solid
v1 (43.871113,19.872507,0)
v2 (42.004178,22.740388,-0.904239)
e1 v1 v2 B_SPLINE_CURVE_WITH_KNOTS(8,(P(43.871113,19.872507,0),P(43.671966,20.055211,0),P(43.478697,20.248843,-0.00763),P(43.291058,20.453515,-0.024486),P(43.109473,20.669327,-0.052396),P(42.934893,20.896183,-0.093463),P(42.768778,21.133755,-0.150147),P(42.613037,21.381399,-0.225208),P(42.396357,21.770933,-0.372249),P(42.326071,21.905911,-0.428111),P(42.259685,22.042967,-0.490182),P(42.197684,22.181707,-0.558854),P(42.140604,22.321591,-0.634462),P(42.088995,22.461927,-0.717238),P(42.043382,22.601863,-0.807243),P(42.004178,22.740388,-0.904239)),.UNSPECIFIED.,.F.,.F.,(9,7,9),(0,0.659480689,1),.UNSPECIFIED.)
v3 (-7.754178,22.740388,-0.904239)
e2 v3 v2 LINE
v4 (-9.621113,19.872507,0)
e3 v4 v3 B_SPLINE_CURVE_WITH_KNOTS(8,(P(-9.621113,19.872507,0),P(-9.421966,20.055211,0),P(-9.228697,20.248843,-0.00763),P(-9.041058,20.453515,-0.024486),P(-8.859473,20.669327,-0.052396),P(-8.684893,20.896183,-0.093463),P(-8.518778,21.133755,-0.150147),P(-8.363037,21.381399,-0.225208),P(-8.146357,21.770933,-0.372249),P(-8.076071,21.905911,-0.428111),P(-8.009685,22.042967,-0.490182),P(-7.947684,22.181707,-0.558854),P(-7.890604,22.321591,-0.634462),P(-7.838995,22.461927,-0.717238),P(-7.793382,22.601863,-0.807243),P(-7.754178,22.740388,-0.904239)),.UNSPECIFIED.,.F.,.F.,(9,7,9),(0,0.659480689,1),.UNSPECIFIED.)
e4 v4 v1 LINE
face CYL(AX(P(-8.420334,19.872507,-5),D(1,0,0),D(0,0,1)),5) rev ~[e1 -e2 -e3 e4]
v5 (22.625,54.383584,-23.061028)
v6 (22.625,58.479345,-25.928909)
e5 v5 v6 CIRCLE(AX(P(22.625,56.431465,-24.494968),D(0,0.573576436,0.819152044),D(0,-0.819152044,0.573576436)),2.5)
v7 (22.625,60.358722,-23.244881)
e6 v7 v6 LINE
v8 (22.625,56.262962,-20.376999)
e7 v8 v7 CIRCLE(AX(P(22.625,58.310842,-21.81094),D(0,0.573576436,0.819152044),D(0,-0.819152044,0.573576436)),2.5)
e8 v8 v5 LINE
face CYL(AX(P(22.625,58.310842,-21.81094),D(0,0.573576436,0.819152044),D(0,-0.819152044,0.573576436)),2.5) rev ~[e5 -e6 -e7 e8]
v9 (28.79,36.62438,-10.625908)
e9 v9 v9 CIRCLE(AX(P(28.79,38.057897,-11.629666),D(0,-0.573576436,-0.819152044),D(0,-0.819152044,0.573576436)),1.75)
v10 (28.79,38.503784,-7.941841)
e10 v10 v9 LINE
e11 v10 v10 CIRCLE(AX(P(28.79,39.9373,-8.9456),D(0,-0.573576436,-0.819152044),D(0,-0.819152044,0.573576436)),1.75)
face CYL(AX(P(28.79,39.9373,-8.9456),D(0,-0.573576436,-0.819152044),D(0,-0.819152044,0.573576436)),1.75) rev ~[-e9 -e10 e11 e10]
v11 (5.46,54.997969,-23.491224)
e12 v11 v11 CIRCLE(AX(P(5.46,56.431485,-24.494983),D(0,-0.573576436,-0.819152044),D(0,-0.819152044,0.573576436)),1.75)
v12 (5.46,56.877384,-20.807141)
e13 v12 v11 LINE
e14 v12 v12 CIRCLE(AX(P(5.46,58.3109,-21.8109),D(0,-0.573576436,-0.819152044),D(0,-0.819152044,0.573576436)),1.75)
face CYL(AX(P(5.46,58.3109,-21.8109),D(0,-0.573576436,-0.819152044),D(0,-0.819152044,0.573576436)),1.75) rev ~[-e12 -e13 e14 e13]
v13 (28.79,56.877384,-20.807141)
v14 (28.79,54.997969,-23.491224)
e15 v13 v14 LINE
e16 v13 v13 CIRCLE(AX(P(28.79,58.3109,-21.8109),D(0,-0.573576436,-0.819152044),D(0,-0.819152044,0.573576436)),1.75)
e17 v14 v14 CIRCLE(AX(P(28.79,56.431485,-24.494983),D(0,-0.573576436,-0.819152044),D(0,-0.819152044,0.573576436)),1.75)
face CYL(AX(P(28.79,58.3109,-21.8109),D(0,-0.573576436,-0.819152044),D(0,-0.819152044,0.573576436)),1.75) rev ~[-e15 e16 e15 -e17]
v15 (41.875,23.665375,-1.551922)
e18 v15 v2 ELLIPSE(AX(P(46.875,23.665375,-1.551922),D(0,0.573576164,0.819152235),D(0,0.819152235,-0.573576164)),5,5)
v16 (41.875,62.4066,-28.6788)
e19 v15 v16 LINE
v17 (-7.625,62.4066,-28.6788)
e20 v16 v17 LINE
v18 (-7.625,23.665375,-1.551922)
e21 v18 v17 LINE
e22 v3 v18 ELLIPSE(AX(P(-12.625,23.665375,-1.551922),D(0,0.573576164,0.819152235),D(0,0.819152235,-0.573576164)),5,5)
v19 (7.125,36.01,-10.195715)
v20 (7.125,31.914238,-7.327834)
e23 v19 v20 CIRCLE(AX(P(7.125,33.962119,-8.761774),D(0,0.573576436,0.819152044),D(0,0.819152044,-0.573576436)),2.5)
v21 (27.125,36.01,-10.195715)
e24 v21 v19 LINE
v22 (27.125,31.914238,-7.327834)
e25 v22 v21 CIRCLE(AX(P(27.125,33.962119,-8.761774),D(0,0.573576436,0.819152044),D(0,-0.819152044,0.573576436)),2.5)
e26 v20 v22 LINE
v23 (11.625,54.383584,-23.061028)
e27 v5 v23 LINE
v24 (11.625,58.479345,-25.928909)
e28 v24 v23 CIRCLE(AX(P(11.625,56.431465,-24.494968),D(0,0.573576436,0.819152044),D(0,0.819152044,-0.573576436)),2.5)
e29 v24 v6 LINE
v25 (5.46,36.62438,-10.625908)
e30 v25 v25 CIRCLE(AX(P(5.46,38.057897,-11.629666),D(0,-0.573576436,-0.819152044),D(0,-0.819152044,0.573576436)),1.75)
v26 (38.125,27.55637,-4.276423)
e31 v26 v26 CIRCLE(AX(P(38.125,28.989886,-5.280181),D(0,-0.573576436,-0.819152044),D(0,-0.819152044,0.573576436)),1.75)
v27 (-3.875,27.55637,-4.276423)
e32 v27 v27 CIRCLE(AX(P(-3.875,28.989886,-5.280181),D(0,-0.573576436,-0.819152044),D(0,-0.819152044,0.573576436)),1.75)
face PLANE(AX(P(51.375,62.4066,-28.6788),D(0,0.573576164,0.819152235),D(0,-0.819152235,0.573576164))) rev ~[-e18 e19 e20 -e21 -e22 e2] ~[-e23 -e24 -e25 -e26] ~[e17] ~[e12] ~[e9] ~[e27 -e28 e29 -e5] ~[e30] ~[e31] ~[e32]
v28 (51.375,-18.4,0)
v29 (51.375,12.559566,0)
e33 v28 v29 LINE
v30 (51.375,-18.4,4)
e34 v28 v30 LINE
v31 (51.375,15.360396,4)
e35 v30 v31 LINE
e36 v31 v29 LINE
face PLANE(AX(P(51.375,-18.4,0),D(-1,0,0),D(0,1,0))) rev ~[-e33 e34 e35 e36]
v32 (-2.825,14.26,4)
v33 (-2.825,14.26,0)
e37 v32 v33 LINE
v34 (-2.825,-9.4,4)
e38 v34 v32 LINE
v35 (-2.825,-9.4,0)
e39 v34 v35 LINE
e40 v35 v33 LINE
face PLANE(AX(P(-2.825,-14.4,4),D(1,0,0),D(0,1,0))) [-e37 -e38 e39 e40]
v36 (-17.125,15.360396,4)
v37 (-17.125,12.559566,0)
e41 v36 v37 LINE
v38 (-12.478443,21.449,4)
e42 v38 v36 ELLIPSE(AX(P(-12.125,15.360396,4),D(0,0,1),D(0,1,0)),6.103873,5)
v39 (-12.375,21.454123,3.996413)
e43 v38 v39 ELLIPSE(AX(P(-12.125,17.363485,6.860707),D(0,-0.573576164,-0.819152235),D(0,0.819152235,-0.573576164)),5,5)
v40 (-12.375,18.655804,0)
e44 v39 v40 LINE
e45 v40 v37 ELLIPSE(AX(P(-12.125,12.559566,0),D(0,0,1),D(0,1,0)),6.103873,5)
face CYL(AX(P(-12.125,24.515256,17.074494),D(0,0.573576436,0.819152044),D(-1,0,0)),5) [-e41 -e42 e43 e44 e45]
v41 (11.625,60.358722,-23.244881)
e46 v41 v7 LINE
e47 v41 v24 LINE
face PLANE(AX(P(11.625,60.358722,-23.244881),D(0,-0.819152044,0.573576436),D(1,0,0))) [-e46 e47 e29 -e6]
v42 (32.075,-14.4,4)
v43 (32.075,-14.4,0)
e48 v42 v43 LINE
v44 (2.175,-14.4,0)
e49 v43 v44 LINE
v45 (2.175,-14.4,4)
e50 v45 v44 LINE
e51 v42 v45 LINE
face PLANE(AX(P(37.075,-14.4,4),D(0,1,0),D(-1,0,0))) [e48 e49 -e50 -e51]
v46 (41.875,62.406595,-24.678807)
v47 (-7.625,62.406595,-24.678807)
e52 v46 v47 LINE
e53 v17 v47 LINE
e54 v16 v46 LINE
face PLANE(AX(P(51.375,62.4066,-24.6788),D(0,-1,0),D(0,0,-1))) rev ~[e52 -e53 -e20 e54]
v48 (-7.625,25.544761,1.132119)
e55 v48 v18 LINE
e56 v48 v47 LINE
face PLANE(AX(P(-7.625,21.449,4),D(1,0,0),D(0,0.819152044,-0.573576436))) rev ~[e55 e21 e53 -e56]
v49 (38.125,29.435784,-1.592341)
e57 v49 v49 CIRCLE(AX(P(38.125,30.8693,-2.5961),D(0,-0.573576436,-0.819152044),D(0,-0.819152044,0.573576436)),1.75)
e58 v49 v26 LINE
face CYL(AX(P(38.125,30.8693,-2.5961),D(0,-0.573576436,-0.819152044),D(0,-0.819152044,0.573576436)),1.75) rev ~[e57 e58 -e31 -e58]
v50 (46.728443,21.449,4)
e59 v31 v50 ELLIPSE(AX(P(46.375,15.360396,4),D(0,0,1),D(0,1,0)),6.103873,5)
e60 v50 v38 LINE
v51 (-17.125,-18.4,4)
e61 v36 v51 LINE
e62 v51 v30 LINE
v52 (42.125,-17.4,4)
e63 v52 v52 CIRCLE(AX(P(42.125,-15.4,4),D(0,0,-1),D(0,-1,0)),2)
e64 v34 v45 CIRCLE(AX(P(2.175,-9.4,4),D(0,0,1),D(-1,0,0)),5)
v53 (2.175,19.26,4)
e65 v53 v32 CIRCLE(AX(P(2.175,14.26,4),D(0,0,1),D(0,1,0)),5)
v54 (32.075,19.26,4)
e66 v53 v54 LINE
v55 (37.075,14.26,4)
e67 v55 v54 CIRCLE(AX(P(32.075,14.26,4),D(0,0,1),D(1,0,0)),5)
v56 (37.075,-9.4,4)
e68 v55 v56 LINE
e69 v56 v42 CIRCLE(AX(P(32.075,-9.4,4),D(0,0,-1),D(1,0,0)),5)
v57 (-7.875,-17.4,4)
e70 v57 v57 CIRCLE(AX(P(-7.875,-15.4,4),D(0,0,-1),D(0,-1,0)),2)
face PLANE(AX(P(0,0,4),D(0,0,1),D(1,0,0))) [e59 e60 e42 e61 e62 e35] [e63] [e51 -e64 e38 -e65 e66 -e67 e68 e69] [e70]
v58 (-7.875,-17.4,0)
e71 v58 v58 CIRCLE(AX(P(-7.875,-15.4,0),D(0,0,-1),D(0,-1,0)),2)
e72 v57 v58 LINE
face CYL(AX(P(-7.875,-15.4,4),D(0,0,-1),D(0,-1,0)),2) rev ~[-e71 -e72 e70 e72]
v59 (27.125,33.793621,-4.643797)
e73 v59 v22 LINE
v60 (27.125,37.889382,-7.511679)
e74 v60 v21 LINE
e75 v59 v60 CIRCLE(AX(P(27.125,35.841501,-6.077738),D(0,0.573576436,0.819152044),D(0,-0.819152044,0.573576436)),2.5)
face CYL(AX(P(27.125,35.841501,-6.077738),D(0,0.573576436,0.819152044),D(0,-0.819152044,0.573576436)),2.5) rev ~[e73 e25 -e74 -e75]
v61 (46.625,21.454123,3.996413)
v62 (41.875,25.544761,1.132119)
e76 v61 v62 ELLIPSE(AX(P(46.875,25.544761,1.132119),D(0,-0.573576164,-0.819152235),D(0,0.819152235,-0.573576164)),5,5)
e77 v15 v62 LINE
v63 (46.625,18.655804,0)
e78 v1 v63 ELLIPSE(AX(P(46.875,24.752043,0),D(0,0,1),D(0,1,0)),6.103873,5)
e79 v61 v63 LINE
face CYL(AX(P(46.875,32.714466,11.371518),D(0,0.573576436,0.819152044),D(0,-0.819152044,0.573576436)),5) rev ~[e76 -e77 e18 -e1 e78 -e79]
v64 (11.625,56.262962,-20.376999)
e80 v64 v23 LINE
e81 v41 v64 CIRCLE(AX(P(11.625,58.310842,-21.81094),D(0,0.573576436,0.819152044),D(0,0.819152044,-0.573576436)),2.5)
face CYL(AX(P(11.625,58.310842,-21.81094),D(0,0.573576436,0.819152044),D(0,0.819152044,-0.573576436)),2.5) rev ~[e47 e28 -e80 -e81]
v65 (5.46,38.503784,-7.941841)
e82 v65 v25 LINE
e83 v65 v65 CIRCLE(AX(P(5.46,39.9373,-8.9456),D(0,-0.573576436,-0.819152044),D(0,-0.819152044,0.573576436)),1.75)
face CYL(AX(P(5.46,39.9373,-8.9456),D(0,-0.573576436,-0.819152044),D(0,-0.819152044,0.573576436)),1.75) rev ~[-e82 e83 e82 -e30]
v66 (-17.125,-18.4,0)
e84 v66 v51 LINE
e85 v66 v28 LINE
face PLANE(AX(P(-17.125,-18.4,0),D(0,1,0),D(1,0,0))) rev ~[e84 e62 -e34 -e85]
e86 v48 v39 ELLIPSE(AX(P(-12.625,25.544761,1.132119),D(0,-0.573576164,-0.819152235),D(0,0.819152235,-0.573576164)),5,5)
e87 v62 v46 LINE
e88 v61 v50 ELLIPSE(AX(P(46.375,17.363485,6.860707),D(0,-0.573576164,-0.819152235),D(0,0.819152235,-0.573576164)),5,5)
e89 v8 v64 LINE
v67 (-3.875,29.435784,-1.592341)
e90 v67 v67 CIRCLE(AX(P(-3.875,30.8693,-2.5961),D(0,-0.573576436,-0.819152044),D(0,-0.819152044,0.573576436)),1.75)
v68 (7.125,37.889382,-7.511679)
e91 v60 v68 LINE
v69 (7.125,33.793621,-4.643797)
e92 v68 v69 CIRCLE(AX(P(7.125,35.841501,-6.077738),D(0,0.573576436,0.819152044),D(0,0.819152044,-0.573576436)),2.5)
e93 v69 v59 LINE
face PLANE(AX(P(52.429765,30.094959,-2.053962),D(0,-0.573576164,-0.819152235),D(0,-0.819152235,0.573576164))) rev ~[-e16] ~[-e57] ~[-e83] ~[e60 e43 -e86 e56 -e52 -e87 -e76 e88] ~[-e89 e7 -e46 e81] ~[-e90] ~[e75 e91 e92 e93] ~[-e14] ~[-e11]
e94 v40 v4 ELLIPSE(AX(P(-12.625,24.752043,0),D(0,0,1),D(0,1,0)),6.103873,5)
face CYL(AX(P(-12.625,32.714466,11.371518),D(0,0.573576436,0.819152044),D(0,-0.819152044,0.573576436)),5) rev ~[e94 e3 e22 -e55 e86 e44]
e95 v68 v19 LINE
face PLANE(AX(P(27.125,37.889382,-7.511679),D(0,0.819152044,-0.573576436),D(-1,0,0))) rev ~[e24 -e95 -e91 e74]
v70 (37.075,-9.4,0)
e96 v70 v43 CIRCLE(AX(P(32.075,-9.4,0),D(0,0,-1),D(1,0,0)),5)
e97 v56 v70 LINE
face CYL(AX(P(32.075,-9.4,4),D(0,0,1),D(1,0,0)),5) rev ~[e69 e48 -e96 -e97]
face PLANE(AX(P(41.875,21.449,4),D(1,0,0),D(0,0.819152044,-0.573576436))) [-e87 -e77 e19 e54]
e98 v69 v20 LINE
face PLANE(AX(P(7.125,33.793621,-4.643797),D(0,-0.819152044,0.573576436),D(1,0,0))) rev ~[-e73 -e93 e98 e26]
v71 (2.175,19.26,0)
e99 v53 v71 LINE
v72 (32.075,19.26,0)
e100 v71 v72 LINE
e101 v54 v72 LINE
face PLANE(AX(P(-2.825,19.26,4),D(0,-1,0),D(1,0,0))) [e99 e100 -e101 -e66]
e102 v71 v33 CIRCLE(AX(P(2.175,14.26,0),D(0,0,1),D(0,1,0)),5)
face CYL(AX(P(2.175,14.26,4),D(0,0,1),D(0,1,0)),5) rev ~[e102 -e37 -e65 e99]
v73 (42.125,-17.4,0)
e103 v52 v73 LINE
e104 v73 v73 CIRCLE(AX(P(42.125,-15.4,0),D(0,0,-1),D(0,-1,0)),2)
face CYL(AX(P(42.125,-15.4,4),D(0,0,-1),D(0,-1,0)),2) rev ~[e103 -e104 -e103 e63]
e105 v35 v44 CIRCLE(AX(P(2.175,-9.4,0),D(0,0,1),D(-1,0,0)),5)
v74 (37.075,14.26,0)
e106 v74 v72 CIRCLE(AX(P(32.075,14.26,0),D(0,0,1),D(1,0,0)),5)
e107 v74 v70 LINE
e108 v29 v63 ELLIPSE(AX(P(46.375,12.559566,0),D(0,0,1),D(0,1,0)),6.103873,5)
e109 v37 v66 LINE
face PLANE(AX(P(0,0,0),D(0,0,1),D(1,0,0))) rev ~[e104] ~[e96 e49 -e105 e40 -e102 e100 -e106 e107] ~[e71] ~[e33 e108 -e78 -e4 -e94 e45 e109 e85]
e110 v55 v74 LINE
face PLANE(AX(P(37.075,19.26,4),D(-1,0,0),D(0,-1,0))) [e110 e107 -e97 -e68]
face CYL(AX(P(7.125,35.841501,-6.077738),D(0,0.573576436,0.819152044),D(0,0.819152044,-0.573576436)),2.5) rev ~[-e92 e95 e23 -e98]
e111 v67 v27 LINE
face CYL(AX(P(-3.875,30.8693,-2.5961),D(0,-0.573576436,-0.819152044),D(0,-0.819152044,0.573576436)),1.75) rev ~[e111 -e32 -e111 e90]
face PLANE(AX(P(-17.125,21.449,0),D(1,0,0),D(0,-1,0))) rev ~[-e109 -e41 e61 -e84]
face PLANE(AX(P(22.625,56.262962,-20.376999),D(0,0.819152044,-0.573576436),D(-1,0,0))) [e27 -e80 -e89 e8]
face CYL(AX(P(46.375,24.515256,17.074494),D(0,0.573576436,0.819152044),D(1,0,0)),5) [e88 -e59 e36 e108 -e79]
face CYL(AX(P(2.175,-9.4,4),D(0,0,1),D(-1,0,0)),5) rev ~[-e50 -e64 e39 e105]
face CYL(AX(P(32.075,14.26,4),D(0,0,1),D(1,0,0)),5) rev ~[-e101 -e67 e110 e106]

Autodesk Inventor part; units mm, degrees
ref_plane "YZ Plane" through (0, 0, 0) normal (1, 0, 0) x (0, 1, 0)
ref_plane "XZ Plane" through (0, 0, 0) normal (0, 1, 0) x (-1, 0, 0)
ref_plane "XY Plane" through (0, 0, 0) normal (0, 0, 1) x (1, 0, 0)
sketch "Sketch1" plane through (0, 0, 0) normal (0, 0, 1) x (1, 0, 0)
  circle A0 centre (42.125, -15.4) radius 2 construction
  circle A1 centre (-7.875, -15.4) radius 2 construction
  line L0 (-4.825, -12.4) -> (-2.825, -14.4) construction
  line L1 (-9.825, -12.4) -> (-4.825, -12.4) construction
  arc A2 (-14.825, -7.4) -> (-9.825, -12.4) centre (-9.825, -7.4) ccw construction
  line L2 (-14.825, -7.4) -> (-14.825, 13.6) construction
  line L3 (-14.825, 13.6) -> (-15.625, 13.6) construction
  line L4 (-15.625, 13.6) -> (-15.625, 14.6) construction
  line L5 (-14.825, 15.4) -> (-15.625, 14.6) construction
  line L6 (-14.825, 15.4) -> (-14.825, 18.4) construction
  line L7 (-14.825, 18.4) -> (-17.125, 18.4) construction
  line L8 (-17.125, 18.4) -> (-17.125, -18.4) construction
  line L9 (-17.125, -18.4) -> (51.375, -18.4) construction
  line L10 (51.375, 18.4) -> (51.375, -18.4) construction
  line L11 (49.075, 18.4) -> (51.375, 18.4) construction
  line L12 (49.075, 15.4) -> (49.075, 18.4) construction
  line L13 (49.875, 14.6) -> (49.075, 15.4) construction
  line L14 (49.875, 13.6) -> (49.875, 14.6) construction
  line L15 (49.075, 13.6) -> (49.875, 13.6) construction
  line L16 (49.075, -7.4) -> (49.075, 13.6) construction
  arc A3 (44.075, -12.4) -> (49.075, -7.4) centre (44.075, -7.4) ccw construction
  line L17 (39.075, -12.4) -> (44.075, -12.4) construction
  line L18 (37.075, -14.4) -> (39.075, -12.4) construction
  line L19 (37.075, -14.4) -> (-2.825, -14.4) construction
  line L20 (-17.125, -18.4) -> (51.375, -18.4)
  line L21 (51.375, -18.4) -> (51.375, 21.449)
  line L22 (51.375, 21.449) -> (-17.125, 21.449)
  line L23 (-17.125, 21.449) -> (-17.125, -18.4)
  point P0 (0, 0)
extrude "Extrusion1" add sketch "Sketch1" along normal blind 4
sketch "Sketch2" plane through (51.375, -18.4, 0) normal (1, 0, 0) x (0, 0, -1)
  line L0 (0, 0) -> (0, 39.849) construction
  line L1 (0, 39.849) -> (-4, 39.849) construction
  line L2 (-4, 0) -> (-4, 39.849) construction
  line L3 (0, 0) -> (-4, 0) construction
  line L4 (-4, 39.849) -> (24.6788, 80.8066)
  line L5 (24.6788, 80.8066) -> (28.6788, 80.8066)
  line L6 (28.6788, 80.8066) -> (0, 39.849)
  line L7 (-4, 39.849) -> (0, 39.849)
  point P0 (0, 18.4)
  dimension "d2" = 55
  dimension "d5" = 50
extrude "Extrusion2" add sketch "Sketch2" against normal up to surface (68.5 mm away)
sketch "Sketch4" plane through (-17.125, 21.449, 4) normal (0, 0.5735764, 0.819152) x (1, 0, 0)
  line L0 (22.585, 45) -> (45.915, 45) construction
  line L1 (45.915, 45) -> (45.915, 22.57) construction
  line L2 (45.915, 22.57) -> (22.585, 22.57) construction
  line L3 (22.585, 22.57) -> (22.585, 45) construction
  line L4 (68.5, 50) -> (0, 50) construction
  point P0 (17.125, -15.2757)
  point P1 (34.25, 45)
  point P2 (34.25, 50)
  dimension "d11" = 23.33
  dimension "d12" = 22.43
  dimension "d13" = 5
hole "Hole1" at (5.46, 58.3109, -21.8109) at (28.79, 58.3109, -21.8109) at (28.79, 39.9373, -8.9456) at (5.46, 39.9373, -8.9456) direction (0, -0.5735764, -0.819152) diameter 3.5 end through all
sketch "Sketch5" plane through (-17.125, 21.449, 4) normal (0, 0.5735764, 0.819152) x (1, 0, 0)
  circle A0 centre (45.915, 22.57) radius 1.75 projected
  circle A1 centre (22.585, 45) radius 1.75 projected
  circle A2 centre (45.915, 45) radius 1.75 projected
  circle A3 centre (22.585, 22.57) radius 1.75 projected
  line L0 (0, 50) -> (0, 0) projected
  line L1 (68.5, 0) -> (0, 0) projected
  line L2 (68.5, 50) -> (68.5, 0) projected
  line L3 (68.5, 50) -> (0, 50) projected
  line L4 (28.75, 45) -> (39.75, 45) construction
  line L5 (28.75, 47.5) -> (39.75, 47.5)
  line L6 (39.75, 42.5) -> (28.75, 42.5)
  arc A4 (28.75, 47.5) -> (28.75, 42.5) centre (28.75, 45) ccw
  arc A5 (39.75, 42.5) -> (39.75, 47.5) centre (39.75, 45) ccw
  point P0 (17.125, -15.2757)
  point P1 (34.25, 45)
  dimension "d25" = 23.33
  dimension "d26" = 5
  dimension "d27" = 11
  dimension "d28" = 11.665
extrude "Extrusion3" cut sketch "Sketch5" against normal through all contours L5 A5 L6 A4
sketch "Sketch6" plane through (-17.125, 21.449, 4) normal (0, 0.5735764, 0.819152) x (1, 0, 0)
  line L0 (24.25, 17.57) -> (44.25, 17.57) construction
  line L1 (24.25, 15.07) -> (44.25, 15.07)
  line L2 (44.25, 20.07) -> (24.25, 20.07)
  arc A0 (24.25, 20.07) -> (24.25, 15.07) centre (24.25, 17.57) ccw
  arc A1 (44.25, 15.07) -> (44.25, 20.07) centre (44.25, 17.57) ccw
  line L3 (68.5, 0) -> (0, 0) projected
  circle A2 centre (22.585, 22.57) radius 1.75 projected
  point P0 (17.125, -15.2757)
  point P1 (34.25, 17.57)
  point P2 (34.25, 0)
  dimension "d31" = 5
  dimension "d32" = 20
  dimension "d33" = 5
extrude "Extrusion4" cut sketch "Sketch6" against normal through all contours A0 L2 A1 L1
sketch "Sketch7" plane through (-17.125, 21.449, 4) normal (0, 0.5735764, 0.819152) x (1, 0, 0)
  line L0 (24.25, 20.07) -> (44.25, 20.07) projected
  line L1 (68.5, 0) -> (0, 0) projected
  point P0 (17.125, -15.2757)
  point P1 (13.25, 11.5)
  point P2 (55.25, 11.5)
  point P3 (34.25, 20.07)
  dimension "d36" = 42
  dimension "d37" = 21
  dimension "d45" = 11.5
hole "Hole2" at (-3.875, 30.8693, -2.5961) at (38.125, 30.8693, -2.5961) direction (0, -0.5735764, -0.819152) diameter 3.5 end through all
sketch "Sketch8" plane through (-17.125, 21.449, 4) normal (0, 0.5735764, 0.819152) x (1, 0, 0)
  line L0 (0, 25.2888) -> (68.5, 25.2888) construction
  circle A0 centre (13.25, 11.5) radius 1.75 construction
  circle A1 centre (55.25, 11.5) radius 1.75 construction
  line L1 (24.25, 20.07) -> (44.25, 20.07) construction
  arc A2 (44.25, 15.07) -> (44.25, 20.07) centre (44.25, 17.57) ccw construction
  line L2 (44.25, 15.07) -> (24.25, 15.07) construction
  arc A3 (24.25, 20.07) -> (24.25, 15.07) centre (24.25, 17.57) ccw construction
  arc A4 (28.75, 47.5) -> (28.75, 42.5) centre (28.75, 45) ccw construction
  line L3 (28.75, 47.5) -> (39.75, 47.5) construction
  arc A5 (39.75, 42.5) -> (39.75, 47.5) centre (39.75, 45) ccw construction
  line L4 (39.75, 42.5) -> (28.75, 42.5) construction
  circle A6 centre (45.915, 22.57) radius 1.75 construction
  circle A7 centre (22.585, 45) radius 1.75 construction
  circle A8 centre (45.915, 45) radius 1.75 construction
  circle A9 centre (22.585, 22.57) radius 1.75 construction
  line L5 (0, 50) -> (0, 0) construction
  line L6 (68.5, 0) -> (0, 0) construction
  line L7 (68.5, 50) -> (68.5, 0) construction
  line L8 (68.5, 50) -> (0, 50) construction
  line L9 (0, 0) -> (9.5, 0)
  line L10 (9.5, 0) -> (9.5, 54)
  line L11 (9.5, 54) -> (0, 54)
  line L12 (0, 54) -> (0, 0)
  line L13 (68.5, 0) -> (59, 0)
  line L14 (59, 0) -> (59, 54)
  line L15 (59, 54) -> (68.5, 54)
  line L16 (68.5, 54) -> (68.5, 0)
  point P0 (17.125, -15.2757)
  dimension "d50" = 9.5
  dimension "d51" = 9.5
  dimension "d52" = 4
extrude "Extrusion5" cut sketch "Sketch8" against normal through all
fillet "Fillet1" radius 5 2 edges at (41.875, 20.0486, 2) (-7.625, 20.0486, 2)
sketch "Sketch9" plane through (0, 0, 4) normal (0, 0, 1) x (1, 0, 0)
  line L0 (-15.875, 15.26) -> (50.125, 15.26) construction
  line L1 (50.125, 15.26) -> (50.125, 13.6) construction
  line L2 (-15.875, 13.6) -> (50.125, 13.6) construction
  line L3 (-15.875, 15.26) -> (-15.875, 13.6) construction
  line L4 (-2.825, -14.4) -> (37.075, -14.4) construction
  line L5 (37.075, -14.4) -> (-2.825, -14.4)
  line L6 (-2.825, -14.4) -> (-2.825, 19.26)
  line L7 (-2.825, 19.26) -> (37.075, 19.26)
  line L8 (37.075, 19.26) -> (37.075, -14.4)
  point P0 (0, 0)
  dimension "d54" = 4
extrude "Extrusion6" cut sketch "Sketch9" against normal through all
fillet "Fillet2" radius 5 6 edges at (-2.825, 19.26, 2) (37.075, 19.26, 2) (37.075, -14.4, 2) (-2.825, -14.4, 2) (51.375, 20.0486, 2) (-17.125, 20.0486, 2)
sketch "Sketch10" plane through (0, 0, 4) normal (0, 0, 1) x (1, 0, 0)
  circle A0 centre (-7.875, -15.4) radius 2 construction
  circle A1 centre (42.125, -15.4) radius 2 construction
  point P0 (0, 0)
hole "Hole3" at (-7.875, -15.4, 4) at (42.125, -15.4, 4) direction (0, 0, -1) diameter 4 end through all
fillet "Fillet3" radius 5 1 edges at (17.125, 21.449, 0)
equation "\"d28\" = 0.5 * d25"
equation "\"d37\" = 0.5 * d36"
equation "\"d51\" = d50"
properties part number "UserInterface mount"
